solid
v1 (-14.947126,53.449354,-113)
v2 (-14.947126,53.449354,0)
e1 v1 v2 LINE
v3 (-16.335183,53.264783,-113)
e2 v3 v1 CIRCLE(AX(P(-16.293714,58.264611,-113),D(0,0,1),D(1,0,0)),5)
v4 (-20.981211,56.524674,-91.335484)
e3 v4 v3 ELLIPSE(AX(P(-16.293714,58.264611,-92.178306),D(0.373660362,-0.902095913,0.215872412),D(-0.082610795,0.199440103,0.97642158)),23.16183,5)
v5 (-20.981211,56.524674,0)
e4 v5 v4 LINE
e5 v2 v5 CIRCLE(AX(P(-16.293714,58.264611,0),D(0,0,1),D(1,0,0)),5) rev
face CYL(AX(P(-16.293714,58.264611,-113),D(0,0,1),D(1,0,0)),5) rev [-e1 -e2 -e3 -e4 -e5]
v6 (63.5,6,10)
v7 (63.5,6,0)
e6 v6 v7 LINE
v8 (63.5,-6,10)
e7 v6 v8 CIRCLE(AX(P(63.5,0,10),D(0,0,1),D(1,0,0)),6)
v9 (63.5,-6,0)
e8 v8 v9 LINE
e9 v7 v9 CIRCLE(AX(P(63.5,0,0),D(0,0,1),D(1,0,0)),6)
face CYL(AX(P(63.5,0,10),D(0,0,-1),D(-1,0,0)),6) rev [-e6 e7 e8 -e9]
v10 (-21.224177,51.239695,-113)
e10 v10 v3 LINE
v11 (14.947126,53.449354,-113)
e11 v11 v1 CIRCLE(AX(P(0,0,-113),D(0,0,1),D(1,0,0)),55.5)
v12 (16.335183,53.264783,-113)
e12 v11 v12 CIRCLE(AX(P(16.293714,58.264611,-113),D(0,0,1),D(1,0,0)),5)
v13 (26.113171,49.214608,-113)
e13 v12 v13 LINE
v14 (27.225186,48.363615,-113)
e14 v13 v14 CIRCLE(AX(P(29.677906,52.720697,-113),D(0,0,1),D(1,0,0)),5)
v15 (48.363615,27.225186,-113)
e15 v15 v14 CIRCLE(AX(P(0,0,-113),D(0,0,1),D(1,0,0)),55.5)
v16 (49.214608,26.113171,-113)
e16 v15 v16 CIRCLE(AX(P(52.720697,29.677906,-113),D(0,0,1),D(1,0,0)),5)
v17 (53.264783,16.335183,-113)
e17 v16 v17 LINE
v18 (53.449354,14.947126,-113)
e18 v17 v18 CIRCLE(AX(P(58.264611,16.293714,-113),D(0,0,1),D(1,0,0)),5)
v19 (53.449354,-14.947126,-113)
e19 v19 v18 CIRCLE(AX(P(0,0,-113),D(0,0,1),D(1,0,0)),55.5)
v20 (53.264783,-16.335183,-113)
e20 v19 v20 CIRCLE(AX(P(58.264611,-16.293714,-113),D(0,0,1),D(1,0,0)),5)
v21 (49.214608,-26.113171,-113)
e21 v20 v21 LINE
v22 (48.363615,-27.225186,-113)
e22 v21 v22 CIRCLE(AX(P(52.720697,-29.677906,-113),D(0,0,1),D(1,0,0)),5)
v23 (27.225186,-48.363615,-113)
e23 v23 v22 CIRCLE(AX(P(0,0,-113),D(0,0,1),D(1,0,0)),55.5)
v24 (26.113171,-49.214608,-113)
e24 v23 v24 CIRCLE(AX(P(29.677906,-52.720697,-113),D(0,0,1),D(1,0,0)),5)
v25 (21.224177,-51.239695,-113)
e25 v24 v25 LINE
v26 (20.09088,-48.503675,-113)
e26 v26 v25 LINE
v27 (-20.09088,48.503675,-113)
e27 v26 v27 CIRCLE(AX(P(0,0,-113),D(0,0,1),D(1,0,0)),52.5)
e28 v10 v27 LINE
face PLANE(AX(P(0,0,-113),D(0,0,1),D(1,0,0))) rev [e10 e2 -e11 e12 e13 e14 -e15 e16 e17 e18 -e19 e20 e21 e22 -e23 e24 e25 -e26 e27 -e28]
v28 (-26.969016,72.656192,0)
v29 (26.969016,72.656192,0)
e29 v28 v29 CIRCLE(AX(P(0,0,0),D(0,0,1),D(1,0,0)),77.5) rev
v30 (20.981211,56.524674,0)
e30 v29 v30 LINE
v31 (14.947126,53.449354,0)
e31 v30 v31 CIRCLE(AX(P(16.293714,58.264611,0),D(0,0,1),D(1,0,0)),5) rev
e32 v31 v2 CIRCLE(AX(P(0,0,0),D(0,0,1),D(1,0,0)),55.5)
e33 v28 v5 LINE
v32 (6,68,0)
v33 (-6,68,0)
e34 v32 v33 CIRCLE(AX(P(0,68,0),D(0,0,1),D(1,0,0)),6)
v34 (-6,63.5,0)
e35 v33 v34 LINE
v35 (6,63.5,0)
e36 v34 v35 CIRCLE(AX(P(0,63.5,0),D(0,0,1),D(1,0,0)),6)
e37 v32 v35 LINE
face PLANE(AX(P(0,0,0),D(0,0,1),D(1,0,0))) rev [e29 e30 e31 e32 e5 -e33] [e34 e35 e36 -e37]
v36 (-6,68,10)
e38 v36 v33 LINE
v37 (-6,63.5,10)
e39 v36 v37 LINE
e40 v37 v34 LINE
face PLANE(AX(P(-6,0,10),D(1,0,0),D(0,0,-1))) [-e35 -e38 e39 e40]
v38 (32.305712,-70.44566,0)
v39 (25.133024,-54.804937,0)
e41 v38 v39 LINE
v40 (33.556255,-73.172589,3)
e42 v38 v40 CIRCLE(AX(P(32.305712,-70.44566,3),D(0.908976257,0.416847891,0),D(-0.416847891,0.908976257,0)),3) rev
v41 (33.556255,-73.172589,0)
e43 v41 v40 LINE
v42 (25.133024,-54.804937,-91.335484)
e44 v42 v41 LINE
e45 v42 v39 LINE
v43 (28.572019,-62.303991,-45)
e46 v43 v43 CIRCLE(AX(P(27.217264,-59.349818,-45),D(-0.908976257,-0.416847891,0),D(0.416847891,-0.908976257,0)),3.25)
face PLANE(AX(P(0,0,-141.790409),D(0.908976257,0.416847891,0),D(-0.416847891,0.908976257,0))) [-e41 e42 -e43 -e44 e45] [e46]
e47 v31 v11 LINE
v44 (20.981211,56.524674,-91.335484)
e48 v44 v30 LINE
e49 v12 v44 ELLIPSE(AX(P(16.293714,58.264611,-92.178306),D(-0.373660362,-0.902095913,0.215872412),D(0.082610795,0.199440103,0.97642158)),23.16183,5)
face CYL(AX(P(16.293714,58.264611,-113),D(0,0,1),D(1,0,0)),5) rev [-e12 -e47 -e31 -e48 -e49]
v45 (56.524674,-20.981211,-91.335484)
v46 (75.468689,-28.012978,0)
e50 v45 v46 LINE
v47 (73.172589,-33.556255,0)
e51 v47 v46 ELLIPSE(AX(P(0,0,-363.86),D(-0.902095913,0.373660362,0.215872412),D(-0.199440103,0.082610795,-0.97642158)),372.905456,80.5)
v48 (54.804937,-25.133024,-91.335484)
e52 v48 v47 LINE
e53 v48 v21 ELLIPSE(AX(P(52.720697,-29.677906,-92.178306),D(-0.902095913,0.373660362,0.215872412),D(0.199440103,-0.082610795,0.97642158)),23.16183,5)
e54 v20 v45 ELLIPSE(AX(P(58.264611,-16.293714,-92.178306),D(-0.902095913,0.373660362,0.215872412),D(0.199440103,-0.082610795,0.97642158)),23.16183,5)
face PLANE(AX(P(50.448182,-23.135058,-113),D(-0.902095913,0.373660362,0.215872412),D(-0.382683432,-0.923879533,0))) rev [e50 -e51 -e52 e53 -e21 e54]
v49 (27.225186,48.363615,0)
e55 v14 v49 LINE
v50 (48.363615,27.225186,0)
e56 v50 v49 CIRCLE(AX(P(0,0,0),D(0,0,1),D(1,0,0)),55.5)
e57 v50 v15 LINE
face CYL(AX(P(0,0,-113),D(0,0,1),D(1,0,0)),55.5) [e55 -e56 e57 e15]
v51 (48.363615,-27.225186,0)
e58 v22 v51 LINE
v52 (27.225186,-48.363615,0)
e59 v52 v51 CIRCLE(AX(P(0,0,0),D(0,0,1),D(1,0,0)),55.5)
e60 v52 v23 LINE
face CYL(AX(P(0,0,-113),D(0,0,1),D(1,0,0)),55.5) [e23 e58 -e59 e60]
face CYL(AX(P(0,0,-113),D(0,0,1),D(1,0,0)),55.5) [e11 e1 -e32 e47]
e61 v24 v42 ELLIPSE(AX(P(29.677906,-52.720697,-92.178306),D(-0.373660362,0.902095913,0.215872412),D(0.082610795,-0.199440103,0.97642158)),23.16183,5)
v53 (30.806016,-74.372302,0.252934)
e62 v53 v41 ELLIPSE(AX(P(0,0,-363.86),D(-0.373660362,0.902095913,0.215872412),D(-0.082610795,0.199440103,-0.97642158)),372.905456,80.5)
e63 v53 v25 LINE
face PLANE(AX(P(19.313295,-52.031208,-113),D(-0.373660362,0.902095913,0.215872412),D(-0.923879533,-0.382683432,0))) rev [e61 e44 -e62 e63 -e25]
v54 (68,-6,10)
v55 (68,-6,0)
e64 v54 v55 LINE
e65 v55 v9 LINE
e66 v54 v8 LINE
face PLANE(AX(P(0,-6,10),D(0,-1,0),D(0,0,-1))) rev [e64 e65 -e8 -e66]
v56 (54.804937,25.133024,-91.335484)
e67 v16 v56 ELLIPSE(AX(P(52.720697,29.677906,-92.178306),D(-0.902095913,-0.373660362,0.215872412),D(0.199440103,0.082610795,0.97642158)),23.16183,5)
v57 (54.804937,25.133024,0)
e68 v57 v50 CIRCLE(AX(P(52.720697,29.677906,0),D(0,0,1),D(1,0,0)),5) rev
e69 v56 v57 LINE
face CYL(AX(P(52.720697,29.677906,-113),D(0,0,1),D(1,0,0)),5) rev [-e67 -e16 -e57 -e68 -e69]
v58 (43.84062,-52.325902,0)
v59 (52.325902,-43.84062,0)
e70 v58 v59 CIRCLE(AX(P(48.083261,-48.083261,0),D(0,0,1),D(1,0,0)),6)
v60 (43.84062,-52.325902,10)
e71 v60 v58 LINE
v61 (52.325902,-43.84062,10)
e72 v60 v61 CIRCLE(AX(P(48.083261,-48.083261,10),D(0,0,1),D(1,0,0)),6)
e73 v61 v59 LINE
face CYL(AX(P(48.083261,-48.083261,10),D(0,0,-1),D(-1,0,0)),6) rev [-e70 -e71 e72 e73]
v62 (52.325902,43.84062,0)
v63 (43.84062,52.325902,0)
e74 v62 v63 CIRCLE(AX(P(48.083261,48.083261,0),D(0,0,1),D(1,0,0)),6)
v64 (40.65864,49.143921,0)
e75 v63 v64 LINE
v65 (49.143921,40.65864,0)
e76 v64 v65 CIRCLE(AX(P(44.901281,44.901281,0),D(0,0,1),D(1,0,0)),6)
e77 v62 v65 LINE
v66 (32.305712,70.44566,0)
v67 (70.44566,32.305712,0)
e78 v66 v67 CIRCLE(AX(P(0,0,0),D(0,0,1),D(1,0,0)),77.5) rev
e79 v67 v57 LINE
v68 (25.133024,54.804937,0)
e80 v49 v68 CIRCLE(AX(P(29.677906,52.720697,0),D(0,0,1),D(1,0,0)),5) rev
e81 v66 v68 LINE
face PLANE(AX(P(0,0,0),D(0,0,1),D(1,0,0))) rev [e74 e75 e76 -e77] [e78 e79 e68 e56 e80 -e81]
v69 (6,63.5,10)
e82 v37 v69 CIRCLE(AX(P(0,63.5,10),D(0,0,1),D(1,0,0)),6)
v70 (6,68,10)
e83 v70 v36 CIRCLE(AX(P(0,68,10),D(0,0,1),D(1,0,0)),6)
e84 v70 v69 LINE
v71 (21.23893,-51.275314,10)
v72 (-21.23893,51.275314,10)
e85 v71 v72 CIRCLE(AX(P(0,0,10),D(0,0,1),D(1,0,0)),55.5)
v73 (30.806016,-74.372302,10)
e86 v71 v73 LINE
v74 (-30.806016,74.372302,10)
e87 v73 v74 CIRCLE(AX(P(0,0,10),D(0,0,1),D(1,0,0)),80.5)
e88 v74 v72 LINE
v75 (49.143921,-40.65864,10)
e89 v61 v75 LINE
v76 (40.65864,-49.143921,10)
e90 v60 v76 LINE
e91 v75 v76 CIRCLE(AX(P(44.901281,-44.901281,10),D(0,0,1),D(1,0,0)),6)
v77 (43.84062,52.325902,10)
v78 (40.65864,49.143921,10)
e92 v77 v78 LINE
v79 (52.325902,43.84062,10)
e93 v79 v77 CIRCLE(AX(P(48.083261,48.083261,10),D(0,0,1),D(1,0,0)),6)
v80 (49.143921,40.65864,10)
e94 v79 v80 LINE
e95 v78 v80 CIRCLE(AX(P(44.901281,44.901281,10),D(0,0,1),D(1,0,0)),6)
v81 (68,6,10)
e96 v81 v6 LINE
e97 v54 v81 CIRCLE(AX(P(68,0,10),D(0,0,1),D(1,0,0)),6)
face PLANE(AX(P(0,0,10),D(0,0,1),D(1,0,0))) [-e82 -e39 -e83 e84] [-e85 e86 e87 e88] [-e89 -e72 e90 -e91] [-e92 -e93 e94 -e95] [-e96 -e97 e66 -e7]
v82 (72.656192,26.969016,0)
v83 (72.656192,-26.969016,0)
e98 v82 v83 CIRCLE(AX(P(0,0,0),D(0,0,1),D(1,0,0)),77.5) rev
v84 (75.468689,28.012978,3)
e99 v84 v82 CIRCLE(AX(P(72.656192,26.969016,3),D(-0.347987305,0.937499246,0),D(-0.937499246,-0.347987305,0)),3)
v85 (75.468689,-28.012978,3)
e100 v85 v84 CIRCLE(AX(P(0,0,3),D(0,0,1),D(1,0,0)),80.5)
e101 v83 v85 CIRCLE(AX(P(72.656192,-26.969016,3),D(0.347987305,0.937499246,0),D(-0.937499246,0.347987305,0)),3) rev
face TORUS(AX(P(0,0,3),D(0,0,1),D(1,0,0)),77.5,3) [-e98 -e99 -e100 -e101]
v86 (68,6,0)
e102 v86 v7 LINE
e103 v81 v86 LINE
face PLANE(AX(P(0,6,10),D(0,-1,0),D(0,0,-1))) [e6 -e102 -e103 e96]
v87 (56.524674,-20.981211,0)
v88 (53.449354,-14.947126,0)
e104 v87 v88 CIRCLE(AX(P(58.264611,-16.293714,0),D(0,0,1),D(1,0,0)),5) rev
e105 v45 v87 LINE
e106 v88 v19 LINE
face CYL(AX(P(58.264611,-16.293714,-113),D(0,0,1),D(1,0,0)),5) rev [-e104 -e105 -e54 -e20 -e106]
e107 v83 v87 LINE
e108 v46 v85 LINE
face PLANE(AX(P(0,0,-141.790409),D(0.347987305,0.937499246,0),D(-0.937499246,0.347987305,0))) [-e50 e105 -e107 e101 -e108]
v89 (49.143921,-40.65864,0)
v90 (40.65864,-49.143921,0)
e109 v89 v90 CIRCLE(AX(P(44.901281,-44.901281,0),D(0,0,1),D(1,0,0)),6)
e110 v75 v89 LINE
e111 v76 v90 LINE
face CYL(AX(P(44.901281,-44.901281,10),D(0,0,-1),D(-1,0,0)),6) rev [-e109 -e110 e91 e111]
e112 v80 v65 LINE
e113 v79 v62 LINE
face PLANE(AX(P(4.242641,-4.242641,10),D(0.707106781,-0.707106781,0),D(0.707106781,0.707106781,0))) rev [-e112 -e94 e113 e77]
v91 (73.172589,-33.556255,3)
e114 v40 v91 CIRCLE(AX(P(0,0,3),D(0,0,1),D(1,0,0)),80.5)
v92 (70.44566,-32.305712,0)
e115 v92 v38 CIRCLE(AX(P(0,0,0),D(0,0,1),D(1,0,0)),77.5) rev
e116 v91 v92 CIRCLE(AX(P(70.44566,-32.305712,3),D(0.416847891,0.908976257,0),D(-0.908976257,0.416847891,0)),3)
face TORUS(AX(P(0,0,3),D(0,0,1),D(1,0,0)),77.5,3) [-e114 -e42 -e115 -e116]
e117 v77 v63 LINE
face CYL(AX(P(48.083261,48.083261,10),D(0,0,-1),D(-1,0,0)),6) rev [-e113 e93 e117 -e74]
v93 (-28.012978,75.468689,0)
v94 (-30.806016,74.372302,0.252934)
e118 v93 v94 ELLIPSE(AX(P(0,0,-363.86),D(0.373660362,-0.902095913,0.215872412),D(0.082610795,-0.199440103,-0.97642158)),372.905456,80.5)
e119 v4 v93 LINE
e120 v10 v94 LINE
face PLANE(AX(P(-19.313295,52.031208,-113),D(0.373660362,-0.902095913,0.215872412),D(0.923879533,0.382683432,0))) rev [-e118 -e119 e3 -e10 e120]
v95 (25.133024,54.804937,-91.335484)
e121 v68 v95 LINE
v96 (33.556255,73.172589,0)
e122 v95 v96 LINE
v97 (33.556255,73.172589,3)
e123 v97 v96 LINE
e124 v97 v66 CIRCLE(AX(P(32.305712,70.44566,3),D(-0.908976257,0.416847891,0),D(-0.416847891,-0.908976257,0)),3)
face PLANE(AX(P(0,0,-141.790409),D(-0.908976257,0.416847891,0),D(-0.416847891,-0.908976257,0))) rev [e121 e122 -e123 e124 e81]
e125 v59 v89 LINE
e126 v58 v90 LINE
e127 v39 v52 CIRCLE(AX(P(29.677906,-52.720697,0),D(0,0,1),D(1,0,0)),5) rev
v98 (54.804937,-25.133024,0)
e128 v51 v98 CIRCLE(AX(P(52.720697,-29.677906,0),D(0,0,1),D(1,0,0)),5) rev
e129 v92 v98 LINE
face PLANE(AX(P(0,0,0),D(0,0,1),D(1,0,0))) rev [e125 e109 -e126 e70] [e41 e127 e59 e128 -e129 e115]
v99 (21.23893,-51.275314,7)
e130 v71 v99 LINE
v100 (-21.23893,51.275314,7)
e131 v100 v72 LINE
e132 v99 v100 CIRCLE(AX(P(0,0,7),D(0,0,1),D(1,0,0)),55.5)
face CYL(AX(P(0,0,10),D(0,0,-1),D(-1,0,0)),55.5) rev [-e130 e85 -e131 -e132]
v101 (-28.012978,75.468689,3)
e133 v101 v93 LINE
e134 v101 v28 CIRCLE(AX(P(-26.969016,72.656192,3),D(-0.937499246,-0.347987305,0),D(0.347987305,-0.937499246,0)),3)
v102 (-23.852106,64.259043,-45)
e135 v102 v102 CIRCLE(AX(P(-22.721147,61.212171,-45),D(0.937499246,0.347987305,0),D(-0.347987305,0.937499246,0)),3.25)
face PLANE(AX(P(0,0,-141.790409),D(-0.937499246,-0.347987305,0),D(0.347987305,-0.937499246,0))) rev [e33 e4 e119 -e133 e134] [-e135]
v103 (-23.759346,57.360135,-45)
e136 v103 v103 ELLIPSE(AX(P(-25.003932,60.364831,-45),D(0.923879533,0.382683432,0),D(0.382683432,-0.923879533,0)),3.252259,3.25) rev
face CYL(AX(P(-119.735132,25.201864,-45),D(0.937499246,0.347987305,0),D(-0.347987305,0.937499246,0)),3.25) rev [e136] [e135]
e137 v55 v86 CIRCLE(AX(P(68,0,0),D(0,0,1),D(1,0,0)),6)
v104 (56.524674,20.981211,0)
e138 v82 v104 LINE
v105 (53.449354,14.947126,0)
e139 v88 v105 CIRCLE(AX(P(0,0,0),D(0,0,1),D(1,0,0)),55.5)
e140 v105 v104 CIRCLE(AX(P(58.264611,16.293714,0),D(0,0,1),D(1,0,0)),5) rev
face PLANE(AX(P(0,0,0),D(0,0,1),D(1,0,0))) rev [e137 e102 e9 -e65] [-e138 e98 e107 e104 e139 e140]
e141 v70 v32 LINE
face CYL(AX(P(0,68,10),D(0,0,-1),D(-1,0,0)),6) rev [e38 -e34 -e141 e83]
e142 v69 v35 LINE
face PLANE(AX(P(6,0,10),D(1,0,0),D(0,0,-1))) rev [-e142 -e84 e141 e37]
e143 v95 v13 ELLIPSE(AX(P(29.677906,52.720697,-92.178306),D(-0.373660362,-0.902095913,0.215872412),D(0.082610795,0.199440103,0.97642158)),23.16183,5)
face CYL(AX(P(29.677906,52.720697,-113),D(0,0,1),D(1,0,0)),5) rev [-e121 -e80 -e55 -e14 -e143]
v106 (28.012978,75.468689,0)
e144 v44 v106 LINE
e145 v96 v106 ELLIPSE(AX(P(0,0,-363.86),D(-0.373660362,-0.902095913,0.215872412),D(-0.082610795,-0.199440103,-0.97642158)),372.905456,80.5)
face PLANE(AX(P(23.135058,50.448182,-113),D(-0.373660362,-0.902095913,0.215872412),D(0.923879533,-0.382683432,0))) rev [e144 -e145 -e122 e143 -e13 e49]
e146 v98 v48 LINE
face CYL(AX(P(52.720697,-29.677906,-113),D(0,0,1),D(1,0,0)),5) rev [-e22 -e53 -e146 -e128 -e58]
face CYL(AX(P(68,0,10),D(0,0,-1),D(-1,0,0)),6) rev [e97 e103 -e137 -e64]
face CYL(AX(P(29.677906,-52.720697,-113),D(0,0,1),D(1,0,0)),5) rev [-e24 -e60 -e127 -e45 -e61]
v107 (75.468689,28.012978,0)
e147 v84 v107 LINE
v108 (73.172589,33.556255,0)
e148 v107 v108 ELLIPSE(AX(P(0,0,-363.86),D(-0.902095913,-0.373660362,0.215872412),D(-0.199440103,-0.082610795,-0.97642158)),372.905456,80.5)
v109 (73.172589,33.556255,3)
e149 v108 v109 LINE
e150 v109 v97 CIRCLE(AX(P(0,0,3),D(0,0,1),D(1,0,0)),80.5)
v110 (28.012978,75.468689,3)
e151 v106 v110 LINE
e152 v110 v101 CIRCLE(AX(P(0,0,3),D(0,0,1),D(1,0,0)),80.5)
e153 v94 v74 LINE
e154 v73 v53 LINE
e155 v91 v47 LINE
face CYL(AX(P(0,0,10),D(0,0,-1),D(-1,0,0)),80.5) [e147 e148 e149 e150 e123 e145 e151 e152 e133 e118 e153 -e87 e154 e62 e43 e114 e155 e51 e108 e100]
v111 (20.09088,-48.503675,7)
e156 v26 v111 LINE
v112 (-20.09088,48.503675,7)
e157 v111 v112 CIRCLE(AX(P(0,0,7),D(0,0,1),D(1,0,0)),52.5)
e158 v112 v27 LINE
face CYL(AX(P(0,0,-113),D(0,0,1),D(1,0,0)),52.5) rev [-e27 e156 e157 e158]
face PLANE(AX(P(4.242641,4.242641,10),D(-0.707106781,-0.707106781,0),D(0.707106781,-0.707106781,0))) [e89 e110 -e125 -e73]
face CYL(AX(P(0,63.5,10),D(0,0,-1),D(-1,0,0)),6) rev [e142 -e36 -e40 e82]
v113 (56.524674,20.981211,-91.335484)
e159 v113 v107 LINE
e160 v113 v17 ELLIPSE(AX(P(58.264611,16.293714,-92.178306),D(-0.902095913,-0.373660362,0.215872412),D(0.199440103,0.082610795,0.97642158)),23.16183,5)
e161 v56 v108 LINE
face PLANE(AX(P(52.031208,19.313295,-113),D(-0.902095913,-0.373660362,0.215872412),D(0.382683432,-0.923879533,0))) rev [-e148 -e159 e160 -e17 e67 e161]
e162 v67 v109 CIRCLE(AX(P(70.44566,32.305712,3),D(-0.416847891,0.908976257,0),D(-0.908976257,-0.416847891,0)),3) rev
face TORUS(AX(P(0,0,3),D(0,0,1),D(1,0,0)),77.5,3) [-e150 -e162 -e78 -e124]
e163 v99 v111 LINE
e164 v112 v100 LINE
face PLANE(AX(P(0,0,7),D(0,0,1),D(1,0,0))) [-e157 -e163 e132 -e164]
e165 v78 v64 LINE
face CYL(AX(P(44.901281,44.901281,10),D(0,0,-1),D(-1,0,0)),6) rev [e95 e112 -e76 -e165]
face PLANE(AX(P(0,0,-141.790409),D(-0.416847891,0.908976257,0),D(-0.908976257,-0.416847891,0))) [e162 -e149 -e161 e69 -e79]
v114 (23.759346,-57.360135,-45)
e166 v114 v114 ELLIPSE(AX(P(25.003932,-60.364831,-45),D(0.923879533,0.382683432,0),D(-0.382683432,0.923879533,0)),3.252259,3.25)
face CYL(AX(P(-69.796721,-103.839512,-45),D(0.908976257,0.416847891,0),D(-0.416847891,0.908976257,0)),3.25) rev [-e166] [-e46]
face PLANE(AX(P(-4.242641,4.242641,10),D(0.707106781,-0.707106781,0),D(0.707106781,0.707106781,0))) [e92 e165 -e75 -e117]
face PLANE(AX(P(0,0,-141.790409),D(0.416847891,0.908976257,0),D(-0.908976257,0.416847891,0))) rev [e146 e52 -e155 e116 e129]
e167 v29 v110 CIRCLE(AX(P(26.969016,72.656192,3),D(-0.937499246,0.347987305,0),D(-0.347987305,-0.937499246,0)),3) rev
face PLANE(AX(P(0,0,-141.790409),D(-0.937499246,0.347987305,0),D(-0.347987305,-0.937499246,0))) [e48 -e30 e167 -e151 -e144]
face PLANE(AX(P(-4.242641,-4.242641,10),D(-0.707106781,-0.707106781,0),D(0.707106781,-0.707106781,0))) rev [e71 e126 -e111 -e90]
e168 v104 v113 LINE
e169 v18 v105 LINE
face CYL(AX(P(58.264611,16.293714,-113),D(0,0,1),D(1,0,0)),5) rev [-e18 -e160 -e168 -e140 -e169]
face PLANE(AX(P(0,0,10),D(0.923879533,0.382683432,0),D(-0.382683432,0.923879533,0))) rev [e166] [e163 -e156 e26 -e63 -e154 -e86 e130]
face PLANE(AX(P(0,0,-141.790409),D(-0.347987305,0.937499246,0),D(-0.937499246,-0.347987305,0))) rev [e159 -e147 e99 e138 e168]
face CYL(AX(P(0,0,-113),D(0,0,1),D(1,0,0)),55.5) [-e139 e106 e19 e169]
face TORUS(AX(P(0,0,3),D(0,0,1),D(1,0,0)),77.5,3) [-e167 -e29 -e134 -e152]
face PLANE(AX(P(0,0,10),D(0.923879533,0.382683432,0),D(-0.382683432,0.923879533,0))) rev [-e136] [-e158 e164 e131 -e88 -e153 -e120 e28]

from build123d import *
from build123d.topology import SkipClean

# Parameters (mm, degrees)
SKETCH1_R               = 80.5
SKETCH1_R_2             = 55.5
BOSS_EXTRUDE1_DEPTH     = 10
BOSS_EXTRUDE2_START     = -120
SKETCH2_R               = 55.5
SKETCH2_R_2             = 52.5
BOSS_EXTRUDE2_DEPTH     = 120
BOSS_EXTRUDE3_START     = 113
BOSS_EXTRUDE3_DEPTH     = 113
SKETCH7_R               = 250
CUT_EXTRUDE1_DEPTH      = 211.239031532
CIRPATTERN1_COUNT       = 8
FILLET1_R               = 5
FILLET2_R               = 5
FILLET3_R               = 5
FILLET4_R               = 5
FILLET5_R               = 5
FILLET6_R               = 5
FILLET7_R               = 5
FILLET8_R               = 5
SKETCH10_R              = 3.25
CUT_EXTRUDE2_DEPTH      = 161.404177003
FILLET10_R              = 3
CUT_EXTRUDE3_DEPTH      = 161.404177103
CUT_EXTRUDE3_DEPTH_BACK = 161.404177103


with BuildPart() as part:
    # Sketch1 → Boss-Extrude1 (new body)
    with BuildSketch(Plane.XY):
        Circle(SKETCH1_R)
        with BuildLine():
            Line((-40.658639918, -49.143921292), (-43.840620434, -52.325901808))
            ThreePointArc((-43.840620434, -52.325901808), (-52.325901808, -52.325901808), (-52.325901808, -43.840620434))
            Line((-52.325901808, -43.840620434), (-49.143921292, -40.658639918))
            ThreePointArc((-49.143921292, -40.658639918), (-42.605180011, -39.35800341), (-38.901280605, -44.901280605))
            ThreePointArc((-38.901280605, -44.901280605), (-39.35800341, -47.1973812), (-40.658639918, -49.143921292))
        make_face(mode=Mode.SUBTRACT)
        Circle(SKETCH1_R_2, mode=Mode.SUBTRACT)
        with BuildLine():
            Line((6, -63.5), (6, -68))
            ThreePointArc((6, -68), (0, -74), (-6, -68))
            Line((-6, -68), (-6, -63.5))
            ThreePointArc((-6, -63.5), (0, -57.5), (6, -63.5))
        make_face(mode=Mode.SUBTRACT)
        with BuildLine():
            Line((49.143921292, -40.658639918), (52.325901808, -43.840620434))
            ThreePointArc((52.325901808, -43.840620434), (53.626538316, -45.787160526), (54.083261121, -48.083261121))
            ThreePointArc((54.083261121, -48.083261121), (50.379361715, -53.626538316), (43.840620434, -52.325901808))
            Line((43.840620434, -52.325901808), (40.658639918, -49.143921292))
            ThreePointArc((40.658639918, -49.143921292), (40.658639918, -40.658639918), (49.143921292, -40.658639918))
        make_face(mode=Mode.SUBTRACT)
        with BuildLine():
            Line((-63.5, -6), (-68, -6))
            ThreePointArc((-68, -6), (-74, 0), (-68, 6))
            Line((-68, 6), (-63.5, 6))
            ThreePointArc((-63.5, 6), (-59.257359313, 4.242640687), (-57.5, 0))
            ThreePointArc((-57.5, 0), (-59.257359313, -4.242640687), (-63.5, -6))
        make_face(mode=Mode.SUBTRACT)
        with BuildLine():
            Line((-49.143921292, 40.658639918), (-52.325901808, 43.840620434))
            ThreePointArc((-52.325901808, 43.840620434), (-52.325901808, 52.325901808), (-43.840620434, 52.325901808))
            Line((-43.840620434, 52.325901808), (-40.658639918, 49.143921292))
            ThreePointArc((-40.658639918, 49.143921292), (-39.35800341, 47.1973812), (-38.901280605, 44.901280605))
            ThreePointArc((-38.901280605, 44.901280605), (-42.605180011, 39.35800341), (-49.143921292, 40.658639918))
        make_face(mode=Mode.SUBTRACT)
        with BuildLine():
            Line((-6, 63.5), (-6, 68))
            ThreePointArc((-6, 68), (0, 74), (6, 68))
            Line((6, 68), (6, 63.5))
            ThreePointArc((6, 63.5), (0, 57.5), (-6, 63.5))
        make_face(mode=Mode.SUBTRACT)
        with BuildLine():
            Line((63.5, 6), (68, 6))
            ThreePointArc((68, 6), (72.242640687, 4.242640687), (74, 0))
            ThreePointArc((74, 0), (72.242640687, -4.242640687), (68, -6))
            Line((68, -6), (63.5, -6))
            ThreePointArc((63.5, -6), (57.5, 0), (63.5, 6))
        make_face(mode=Mode.SUBTRACT)
        with BuildLine():
            Line((40.658639918, 49.143921292), (43.840620434, 52.325901808))
            ThreePointArc((43.840620434, 52.325901808), (50.379361715, 53.626538316), (54.083261121, 48.083261121))
            ThreePointArc((54.083261121, 48.083261121), (53.626538316, 45.787160526), (52.325901808, 43.840620434))
            Line((52.325901808, 43.840620434), (49.143921292, 40.658639918))
            ThreePointArc((49.143921292, 40.658639918), (40.658639918, 40.658639918), (40.658639918, 49.143921292))
        make_face(mode=Mode.SUBTRACT)
    extrude(amount=BOSS_EXTRUDE1_DEPTH)

    # Sketch2 → Boss-Extrude2 (add)
    with BuildSketch(Plane.XY.offset(7).offset(BOSS_EXTRUDE2_START)):
        Circle(SKETCH2_R)
        Circle(SKETCH2_R_2, mode=Mode.SUBTRACT)
    extrude(amount=BOSS_EXTRUDE2_DEPTH)

    # Sketch6 → Boss-Extrude3 (add)
    with SkipClean():  # the faces are left unmerged after this step: merging them gives an invalid solid
        with BuildSketch(Plane(origin=(0, 0, 0), x_dir=(-1, 0, 0), z_dir=(0, 0, -1)).offset(BOSS_EXTRUDE3_START)):
            with BuildLine():
                ThreePointArc((33.556255229, 73.172588686), (30.806016305, 74.372302367), (28.012978034, 75.46868928))
                Line((28.012978034, 75.46868928), (19.313295414, 52.031208137))
                ThreePointArc((19.313295414, 52.031208137), (21.238930496, 51.275314054), (23.135057953, 50.448182262))
                Line((23.135057953, 50.448182262), (33.556255229, 73.172588686))
            make_face()
        boss_extrude3 = extrude(amount=-BOSS_EXTRUDE3_DEPTH)

    # Sketch7 → Cut-Extrude1 (cut, through all)
    with BuildSketch(Plane(origin=(-29.35002585, 70.857230463, -16.956202766), x_dir=(-0.9275655947526923, -0.3633903135082553, 0.08700314637676126), z_dir=(0.37366036168069705, -0.9020959128907735, 0.21587241151757414))):
        with Locations((-10.82464423, 97.787489685)):
            Circle(SKETCH7_R)
    cut_extrude1 = extrude(amount=-CUT_EXTRUDE1_DEPTH, mode=Mode.SUBTRACT)

    # CirPattern1: Boss-Extrude3, Cut-Extrude1 ×8 about axis
    with SkipClean():  # the faces are left unmerged after this step: merging them gives an invalid solid
        cirpattern1_axis = Axis((0, 0, 0), (0, 0, 1))
        add([boss_extrude3.rotate(cirpattern1_axis, i * 360 / CIRPATTERN1_COUNT) for i in range(1, CIRPATTERN1_COUNT)])
        add([cut_extrude1.rotate(cirpattern1_axis, i * 360 / CIRPATTERN1_COUNT) for i in range(1, CIRPATTERN1_COUNT)], mode=Mode.SUBTRACT)

    # Fillet1
    fillet1_edges = [part.edges().sort_by_distance(p)[0] for p in [
        (-19.313295414, -52.031208137, -56.5),
        (19.313295414, -52.031208137, -56.5),
    ]]
    fillet(fillet1_edges, radius=FILLET1_R)

    # Fillet2
    fillet2_edges = [part.edges().sort_by_distance(p)[0] for p in [
        (23.135057953, -50.448182262, -56.5),
        (50.448182262, -23.135057953, -56.5),
    ]]
    fillet(fillet2_edges, radius=FILLET2_R)

    # Fillet3
    fillet3_edges = [part.edges().sort_by_distance(p)[0] for p in [
        (52.031208137, -19.313295414, -56.5),
        (52.031208137, 19.313295414, -56.5),
    ]]
    fillet(fillet3_edges, radius=FILLET3_R)

    # Fillet4
    fillet4_edges = [part.edges().sort_by_distance(p)[0] for p in [
        (50.448182262, 23.135057953, -56.5),
        (23.135057953, 50.448182262, -56.5),
    ]]
    fillet(fillet4_edges, radius=FILLET4_R)

    # Fillet5
    fillet5_edges = [part.edges().sort_by_distance(p)[0] for p in [
        (-19.313295414, 52.031208137, -56.5),
        (19.313295414, 52.031208137, -56.5),
    ]]
    fillet(fillet5_edges, radius=FILLET5_R)

    # Fillet6
    fillet6_edges = [part.edges().sort_by_distance(p)[0] for p in [
        (-23.135057953, 50.448182262, -56.5),
        (-50.448182262, 23.135057953, -56.5),
    ]]
    fillet(fillet6_edges, radius=FILLET6_R)

    # Fillet7
    fillet7_edges = [part.edges().sort_by_distance(p)[0] for p in [
        (-52.031208137, 19.313295414, -56.5),
        (-52.031208137, -19.313295414, -56.5),
    ]]
    fillet(fillet7_edges, radius=FILLET7_R)

    # Fillet8
    fillet8_edges = [part.edges().sort_by_distance(p)[0] for p in [
        (-50.448182262, -23.135057953, -56.5),
        (-23.135057953, -50.448182262, -56.5),
    ]]
    fillet(fillet8_edges, radius=FILLET8_R)

    # Sketch10 → Cut-Extrude2 (cut, through all)
    with BuildSketch(Plane(origin=(0, 0, 0), x_dir=(0, 0, -1), z_dir=(0.93749924571842, 0.3479873047646907, 0))):
        with Locations(Location((45, 65.293034424, 0), (0, 0, 90))):
            Circle(SKETCH10_R)
    cut_extrude2 = extrude(amount=-CUT_EXTRUDE2_DEPTH, mode=Mode.SUBTRACT)

    # Mirror1: Cut-Extrude2 across plane
    add(cut_extrude2.mirror(Plane(origin=(0, 0, 0), x_dir=(0, 0, 1), z_dir=(-0.382683432365086, 0.9238795325112884, 0))), mode=Mode.SUBTRACT)

    # Fillet10
    # the kernel refuses this fillet: 3 mm, written as the material it takes off along each edge
    with BuildSketch(Plane(origin=(0, 0, 0), x_dir=(-0.33046803638275346, 0.9438171840612604, 0), z_dir=(0.9438171840612604, 0.33046803638275346, 0))) as fillet10_piece_1_section:
        with BuildLine():
            CenterArc((80.5 - FILLET10_R, FILLET10_R), FILLET10_R, 270, 90)
            Line((80.5 - FILLET10_R, 0), (80.5, 0))
            Line((80.5, 0), (80.5, FILLET10_R))
        make_face()
    fillet10_piece_1 = revolve(axis=Axis((0, 0, 0), (0, 0, 1)), revolution_arc=46.06707315, mode=Mode.PRIVATE)
    fillet10_piece_1 = split(fillet10_piece_1, bisect_by=Plane(origin=(-27.776847932, 74.832540233, 0.682281157), z_dir=(0.93749924571842, 0.34798730476469053, 0)), keep=Keep.TOP, mode=Mode.PRIVATE)
    add(fillet10_piece_1, mode=Mode.SUBTRACT)
    with BuildSketch(Plane(origin=(0, 0, 0), x_dir=(-0.41684789103882375, 0.9089762569707115, 0), z_dir=(0.9089762569707115, 0.41684789103882375, 0))) as fillet10_piece_2:
        with BuildLine():
            CenterArc((80.5 - FILLET10_R, FILLET10_R), FILLET10_R, 270, 90)
            Line((80.5 - FILLET10_R, 0), (80.5, 0))
            Line((80.5, 0), (80.5, FILLET10_R))
        make_face()
    revolve(axis=Axis((0, 0, 0), (0, 0, 1)), revolution_arc=40.728517997, mode=Mode.SUBTRACT)
    with BuildSketch(Plane(origin=(0, 0, 0), x_dir=(-0.41684789103882375, 0.9089762569707115, 0), z_dir=(0.9089762569707115, 0.41684789103882375, 0))) as fillet10_piece_3_section:
        with BuildLine():
            CenterArc((80.5 - FILLET10_R, FILLET10_R), FILLET10_R, 270, 90)
            Line((80.5 - FILLET10_R, 0), (80.5, 0))
            Line((80.5, 0), (80.5, FILLET10_R))
        make_face()
    fillet10_piece_3 = revolve(axis=Axis((0, 0, 0), (0, 0, 1)), revolution_arc=46.06707315, mode=Mode.PRIVATE)
    fillet10_piece_3 = split(fillet10_piece_3, bisect_by=Plane(origin=(-74.832540233, 27.776847932, 0.682281157), z_dir=(-0.34798730476469253, -0.9374992457184192, 0)), keep=Keep.TOP, mode=Mode.PRIVATE)
    add(fillet10_piece_3, mode=Mode.SUBTRACT)
    with BuildSketch(Plane(origin=(0, 0, 0), x_dir=(-0.9010557205417569, 0.4337033415584614, 0), z_dir=(0.4337033415584614, 0.9010557205417569, 0))) as fillet10_piece_4_section:
        with BuildLine():
            CenterArc((80.5 - FILLET10_R, FILLET10_R), FILLET10_R, 270, 90)
            Line((80.5 - FILLET10_R, 0), (80.5, 0))
            Line((80.5, 0), (80.5, FILLET10_R))
        make_face()
    fillet10_piece_4 = revolve(axis=Axis((0, 0, 0), (0, 0, 1)), revolution_arc=46.06707315, mode=Mode.PRIVATE)
    fillet10_piece_4 = split(fillet10_piece_4, bisect_by=Plane(origin=(-72.555793839, 33.273398961, 0.682281047), z_dir=(0.4168478910388258, 0.9089762569707106, 0)), keep=Keep.TOP, mode=Mode.PRIVATE)
    add(fillet10_piece_4, mode=Mode.SUBTRACT)
    with BuildSketch(Plane(origin=(0, 0, 0), x_dir=(-0.9374992457184192, 0.34798730476469253, 0), z_dir=(0.34798730476469253, 0.9374992457184192, 0))) as fillet10_piece_5:
        with BuildLine():
            CenterArc((80.5 - FILLET10_R, FILLET10_R), FILLET10_R, 270, 90)
            Line((80.5 - FILLET10_R, 0), (80.5, 0))
            Line((80.5, 0), (80.5, FILLET10_R))
        make_face()
    revolve(axis=Axis((0, 0, 0), (0, 0, 1)), revolution_arc=40.728517997, mode=Mode.SUBTRACT)
    with BuildSketch(Plane(origin=(0, 0, 0), x_dir=(-0.9374992457184192, 0.34798730476469253, 0), z_dir=(0.34798730476469253, 0.9374992457184192, 0))) as fillet10_piece_6_section:
        with BuildLine():
            CenterArc((80.5 - FILLET10_R, FILLET10_R), FILLET10_R, 270, 90)
            Line((80.5 - FILLET10_R, 0), (80.5, 0))
            Line((80.5, 0), (80.5, FILLET10_R))
        make_face()
    fillet10_piece_6 = revolve(axis=Axis((0, 0, 0), (0, 0, 1)), revolution_arc=46.06707315, mode=Mode.PRIVATE)
    fillet10_piece_6 = split(fillet10_piece_6, bisect_by=Plane(origin=(-72.555794184, -33.27339912, 0.682281157), z_dir=(0.41684789103882375, -0.9089762569707115, 0)), keep=Keep.TOP, mode=Mode.PRIVATE)
    add(fillet10_piece_6, mode=Mode.SUBTRACT)
    with BuildSketch(Plane(origin=(0, 0, 0), x_dir=(-0.9438171840612604, -0.3304680363827534, 0), z_dir=(-0.3304680363827534, 0.9438171840612604, 0))) as fillet10_piece_7_section:
        with BuildLine():
            CenterArc((80.5 - FILLET10_R, FILLET10_R), FILLET10_R, 270, 90)
            Line((80.5 - FILLET10_R, 0), (80.5, 0))
            Line((80.5, 0), (80.5, FILLET10_R))
        make_face()
    fillet10_piece_7 = revolve(axis=Axis((0, 0, 0), (0, 0, 1)), revolution_arc=46.06707315, mode=Mode.PRIVATE)
    fillet10_piece_7 = split(fillet10_piece_7, bisect_by=Plane(origin=(-74.832540233, -27.776847932, 0.682281157), z_dir=(-0.3479873047646904, 0.93749924571842, 0)), keep=Keep.TOP, mode=Mode.PRIVATE)
    add(fillet10_piece_7, mode=Mode.SUBTRACT)
    with BuildSketch(Plane(origin=(0, 0, 0), x_dir=(-0.9089762569707115, -0.41684789103882364, 0), z_dir=(-0.41684789103882364, 0.9089762569707115, 0))) as fillet10_piece_8:
        with BuildLine():
            CenterArc((80.5 - FILLET10_R, FILLET10_R), FILLET10_R, 270, 90)
            Line((80.5 - FILLET10_R, 0), (80.5, 0))
            Line((80.5, 0), (80.5, FILLET10_R))
        make_face()
    revolve(axis=Axis((0, 0, 0), (0, 0, 1)), revolution_arc=40.728517997, mode=Mode.SUBTRACT)
    with BuildSketch(Plane(origin=(0, 0, 0), x_dir=(-0.9089762569707115, -0.41684789103882364, 0), z_dir=(-0.41684789103882364, 0.9089762569707115, 0))) as fillet10_piece_9_section:
        with BuildLine():
            CenterArc((80.5 - FILLET10_R, FILLET10_R), FILLET10_R, 270, 90)
            Line((80.5 - FILLET10_R, 0), (80.5, 0))
            Line((80.5, 0), (80.5, FILLET10_R))
        make_face()
    fillet10_piece_9 = revolve(axis=Axis((0, 0, 0), (0, 0, 1)), revolution_arc=46.06707315, mode=Mode.PRIVATE)
    fillet10_piece_9 = split(fillet10_piece_9, bisect_by=Plane(origin=(-27.776847932, -74.832540233, 0.682281157), z_dir=(0.9374992457184192, -0.34798730476469253, 0)), keep=Keep.TOP, mode=Mode.PRIVATE)
    add(fillet10_piece_9, mode=Mode.SUBTRACT)
    with BuildSketch(Plane(origin=(0, 0, 0), x_dir=(-0.4337033415584623, -0.9010557205417564, 0), z_dir=(-0.9010557205417564, 0.4337033415584623, 0))) as fillet10_piece_10_section:
        with BuildLine():
            CenterArc((80.5 - FILLET10_R, FILLET10_R), FILLET10_R, 270, 90)
            Line((80.5 - FILLET10_R, 0), (80.5, 0))
            Line((80.5, 0), (80.5, FILLET10_R))
        make_face()
    fillet10_piece_10 = revolve(axis=Axis((0, 0, 0), (0, 0, 1)), revolution_arc=46.06707315, mode=Mode.PRIVATE)
    fillet10_piece_10 = split(fillet10_piece_10, bisect_by=Plane(origin=(-33.273398964, -72.555793844, 0.68228105), z_dir=(-0.9089762569707106, 0.4168478910388258, 0)), keep=Keep.TOP, mode=Mode.PRIVATE)
    add(fillet10_piece_10, mode=Mode.SUBTRACT)
    with BuildSketch(Plane(origin=(0, 0, 0), x_dir=(-0.34798730476469303, -0.9374992457184189, 0), z_dir=(-0.9374992457184189, 0.34798730476469303, 0))) as fillet10_piece_11:
        with BuildLine():
            CenterArc((80.5 - FILLET10_R, FILLET10_R), FILLET10_R, 270, 90)
            Line((80.5 - FILLET10_R, 0), (80.5, 0))
            Line((80.5, 0), (80.5, FILLET10_R))
        make_face()
    revolve(axis=Axis((0, 0, 0), (0, 0, 1)), revolution_arc=40.728517997, mode=Mode.SUBTRACT)
    with BuildSketch(Plane(origin=(0, 0, 0), x_dir=(-0.34798730476469303, -0.9374992457184189, 0), z_dir=(-0.9374992457184189, 0.34798730476469303, 0))) as fillet10_piece_12_section:
        with BuildLine():
            CenterArc((80.5 - FILLET10_R, FILLET10_R), FILLET10_R, 270, 90)
            Line((80.5 - FILLET10_R, 0), (80.5, 0))
            Line((80.5, 0), (80.5, FILLET10_R))
        make_face()
    fillet10_piece_12 = revolve(axis=Axis((0, 0, 0), (0, 0, 1)), revolution_arc=46.06707315, mode=Mode.PRIVATE)
    fillet10_piece_12 = split(fillet10_piece_12, bisect_by=Plane(origin=(33.27339912, -72.555794184, 0.682281157), z_dir=(0.9089762569707115, 0.41684789103882375, 0)), keep=Keep.TOP, mode=Mode.PRIVATE)
    add(fillet10_piece_12, mode=Mode.SUBTRACT)
    with BuildSketch(Plane(origin=(0, 0, 0), x_dir=(0.3304680363827525, -0.9438171840612608, 0), z_dir=(-0.9438171840612608, -0.3304680363827525, 0))) as fillet10_piece_13_section:
        with BuildLine():
            CenterArc((80.5 - FILLET10_R, FILLET10_R), FILLET10_R, 270, 90)
            Line((80.5 - FILLET10_R, 0), (80.5, 0))
            Line((80.5, 0), (80.5, FILLET10_R))
        make_face()
    fillet10_piece_13 = revolve(axis=Axis((0, 0, 0), (0, 0, 1)), revolution_arc=46.06707315, mode=Mode.PRIVATE)
    fillet10_piece_13 = split(fillet10_piece_13, bisect_by=Plane(origin=(27.776847932, -74.832540233, 0.682281157), z_dir=(-0.93749924571842, -0.3479873047646904, 0)), keep=Keep.TOP, mode=Mode.PRIVATE)
    add(fillet10_piece_13, mode=Mode.SUBTRACT)
    with BuildSketch(Plane(origin=(0, 0, 0), x_dir=(0.4168478910388232, -0.9089762569707117, 0), z_dir=(-0.9089762569707117, -0.4168478910388232, 0))) as fillet10_piece_14:
        with BuildLine():
            CenterArc((80.5 - FILLET10_R, FILLET10_R), FILLET10_R, 270, 90)
            Line((80.5 - FILLET10_R, 0), (80.5, 0))
            Line((80.5, 0), (80.5, FILLET10_R))
        make_face()
    revolve(axis=Axis((0, 0, 0), (0, 0, 1)), revolution_arc=40.728517997, mode=Mode.SUBTRACT)
    with BuildSketch(Plane(origin=(0, 0, 0), x_dir=(0.4168478910388232, -0.9089762569707117, 0), z_dir=(-0.9089762569707117, -0.4168478910388232, 0))) as fillet10_piece_15_section:
        with BuildLine():
            CenterArc((80.5 - FILLET10_R, FILLET10_R), FILLET10_R, 270, 90)
            Line((80.5 - FILLET10_R, 0), (80.5, 0))
            Line((80.5, 0), (80.5, FILLET10_R))
        make_face()
    fillet10_piece_15 = revolve(axis=Axis((0, 0, 0), (0, 0, 1)), revolution_arc=46.06707315, mode=Mode.PRIVATE)
    fillet10_piece_15 = split(fillet10_piece_15, bisect_by=Plane(origin=(74.832540233, -27.776847932, 0.682281157), z_dir=(0.34798730476469264, 0.9374992457184192, 0)), keep=Keep.TOP, mode=Mode.PRIVATE)
    add(fillet10_piece_15, mode=Mode.SUBTRACT)
    with BuildSketch(Plane(origin=(0, 0, 0), x_dir=(1, 0, 0), z_dir=(0, -1, 0))) as fillet10_piece_16:
        with BuildLine():
            CenterArc((80.5 - FILLET10_R, FILLET10_R), FILLET10_R, 270, 90)
            Line((80.5 - FILLET10_R, 0), (80.5, 0))
            Line((80.5, 0), (80.5, FILLET10_R))
        make_face()
    revolve(axis=Axis((0, 0, 0), (0, 0, 1)), revolution_arc=20.364258998, mode=Mode.SUBTRACT)
    with BuildSketch(Plane(origin=(0, 0, 0), x_dir=(1, 0, 0), z_dir=(0, -1, 0))) as fillet10_piece_17_section:
        with BuildLine():
            CenterArc((80.5 - FILLET10_R, FILLET10_R), FILLET10_R, 270, 90)
            Line((80.5 - FILLET10_R, 0), (80.5, 0))
            Line((80.5, 0), (80.5, FILLET10_R))
        make_face()
    fillet10_piece_17 = revolve(axis=Axis((0, 0, 0), (0, 0, 1)), revolution_arc=25.70248486, mode=Mode.PRIVATE)
    fillet10_piece_17 = split(fillet10_piece_17, bisect_by=Plane(origin=(72.555796773, 33.273400307, 0.682281157), z_dir=(-0.41684789103882364, 0.9089762569707116, 0)), keep=Keep.TOP, mode=Mode.PRIVATE)
    add(fillet10_piece_17, mode=Mode.SUBTRACT)
    with BuildSketch(Plane(origin=(0, 0, 0), x_dir=(0.9438171840612604, 0.3304680363827533, 0), z_dir=(0.3304680363827533, -0.9438171840612604, 0))) as fillet10_piece_18_section:
        with BuildLine():
            CenterArc((80.5 - FILLET10_R, FILLET10_R), FILLET10_R, 270, 90)
            Line((80.5 - FILLET10_R, 0), (80.5, 0))
            Line((80.5, 0), (80.5, FILLET10_R))
        make_face()
    fillet10_piece_18 = revolve(axis=Axis((0, 0, 0), (0, 0, 1)), revolution_arc=46.06707315, mode=Mode.PRIVATE)
    fillet10_piece_18 = split(fillet10_piece_18, bisect_by=Plane(origin=(74.832540233, 27.776847932, 0.682281157), z_dir=(0.3479873047646903, -0.9374992457184201, 0)), keep=Keep.TOP, mode=Mode.PRIVATE)
    add(fillet10_piece_18, mode=Mode.SUBTRACT)
    with BuildSketch(Plane(origin=(0, 0, 0), x_dir=(0.9089762569707115, 0.41684789103882364, 0), z_dir=(0.41684789103882364, -0.9089762569707115, 0))) as fillet10_piece_19:
        with BuildLine():
            CenterArc((80.5 - FILLET10_R, FILLET10_R), FILLET10_R, 270, 90)
            Line((80.5 - FILLET10_R, 0), (80.5, 0))
            Line((80.5, 0), (80.5, FILLET10_R))
        make_face()
    revolve(axis=Axis((0, 0, 0), (0, 0, 1)), revolution_arc=40.728517997, mode=Mode.SUBTRACT)
    with BuildSketch(Plane(origin=(0, 0, 0), x_dir=(0.9089762569707115, 0.41684789103882364, 0), z_dir=(0.41684789103882364, -0.9089762569707115, 0))) as fillet10_piece_20_section:
        with BuildLine():
            CenterArc((80.5 - FILLET10_R, FILLET10_R), FILLET10_R, 270, 90)
            Line((80.5 - FILLET10_R, 0), (80.5, 0))
            Line((80.5, 0), (80.5, FILLET10_R))
        make_face()
    fillet10_piece_20 = revolve(axis=Axis((0, 0, 0), (0, 0, 1)), revolution_arc=46.06707315, mode=Mode.PRIVATE)
    fillet10_piece_20 = split(fillet10_piece_20, bisect_by=Plane(origin=(27.776847932, 74.832540233, 0.682281157), z_dir=(-0.9374992457184192, 0.3479873047646927, 0)), keep=Keep.TOP, mode=Mode.PRIVATE)
    add(fillet10_piece_20, mode=Mode.SUBTRACT)
    with BuildSketch(Plane(origin=(0, 0, 0), x_dir=(0.4337033415584618, 0.9010557205417566, 0), z_dir=(0.9010557205417566, -0.4337033415584618, 0))) as fillet10_piece_21_section:
        with BuildLine():
            CenterArc((80.5 - FILLET10_R, FILLET10_R), FILLET10_R, 270, 90)
            Line((80.5 - FILLET10_R, 0), (80.5, 0))
            Line((80.5, 0), (80.5, FILLET10_R))
        make_face()
    fillet10_piece_21 = revolve(axis=Axis((0, 0, 0), (0, 0, 1)), revolution_arc=46.06707315, mode=Mode.PRIVATE)
    fillet10_piece_21 = split(fillet10_piece_21, bisect_by=Plane(origin=(33.27339912, 72.555794184, 0.682281157), z_dir=(0.9089762569707105, -0.41684789103882597, 0)), keep=Keep.TOP, mode=Mode.PRIVATE)
    add(fillet10_piece_21, mode=Mode.SUBTRACT)
    with BuildSketch(Plane(origin=(0, 0, 0), x_dir=(0.3479873047646927, 0.9374992457184191, 0), z_dir=(0.9374992457184191, -0.3479873047646927, 0))) as fillet10_piece_22:
        with BuildLine():
            CenterArc((80.5 - FILLET10_R, FILLET10_R), FILLET10_R, 270, 90)
            Line((80.5 - FILLET10_R, 0), (80.5, 0))
            Line((80.5, 0), (80.5, FILLET10_R))
        make_face()
    revolve(axis=Axis((0, 0, 0), (0, 0, 1)), revolution_arc=40.728517997, mode=Mode.SUBTRACT)
    with BuildSketch(Plane(origin=(0, 0, 0), x_dir=(0.3479873047646927, 0.9374992457184191, 0), z_dir=(0.9374992457184191, -0.3479873047646927, 0))) as fillet10_piece_23_section:
        with BuildLine():
            CenterArc((80.5 - FILLET10_R, FILLET10_R), FILLET10_R, 270, 90)
            Line((80.5 - FILLET10_R, 0), (80.5, 0))
            Line((80.5, 0), (80.5, FILLET10_R))
        make_face()
    fillet10_piece_23 = revolve(axis=Axis((0, 0, 0), (0, 0, 1)), revolution_arc=46.06707315, mode=Mode.PRIVATE)
    fillet10_piece_23 = split(fillet10_piece_23, bisect_by=Plane(origin=(-33.27339912, 72.555794184, 0.682281157), z_dir=(-0.9089762569707115, -0.41684789103882386, 0)), keep=Keep.TOP, mode=Mode.PRIVATE)
    add(fillet10_piece_23, mode=Mode.SUBTRACT)
    with BuildSketch(Plane(origin=(0, 0, 0), x_dir=(0.9010582131201076, -0.43369816297604785, 0), z_dir=(-0.43369816297604785, -0.9010582131201076, 0))) as fillet10_piece_24_section:
        with BuildLine():
            CenterArc((80.5 - FILLET10_R, FILLET10_R), FILLET10_R, 270, 90)
            Line((80.5 - FILLET10_R, 0), (80.5, 0))
            Line((80.5, 0), (80.5, FILLET10_R))
        make_face()
    fillet10_piece_24 = revolve(axis=Axis((0, 0, 0), (0, 0, 1)), revolution_arc=25.70248486, mode=Mode.PRIVATE)
    fillet10_piece_24 = split(fillet10_piece_24, bisect_by=Plane(origin=(72.555796773, -33.273400307, 0.682281157), z_dir=(-0.4168478910388259, -0.9089762569707107, 0)), keep=Keep.TOP, mode=Mode.PRIVATE)
    add(fillet10_piece_24, mode=Mode.SUBTRACT)
    with BuildSketch(Plane(origin=(0, 0, 0), x_dir=(0.9374992457184188, -0.3479873047646939, 0), z_dir=(-0.3479873047646939, -0.9374992457184188, 0))) as fillet10_piece_25:
        with BuildLine():
            CenterArc((80.5 - FILLET10_R, FILLET10_R), FILLET10_R, 270, 90)
            Line((80.5 - FILLET10_R, 0), (80.5, 0))
            Line((80.5, 0), (80.5, FILLET10_R))
        make_face()
    revolve(axis=Axis((0, 0, 0), (0, 0, 1)), revolution_arc=20.364258998, mode=Mode.SUBTRACT)

    # Sketch11 → Cut-Extrude3 (cut, two sides: drawn at the far end of the back side and taken through both)
    with BuildSketch(Plane(origin=(0, 0, 0), x_dir=(-1, 0, 0), z_dir=(0, 0, -1)).offset(-CUT_EXTRUDE3_DEPTH_BACK)):
        Polygon((0, 0), (45.922011884, 110.865543901), (156.787555785, 64.943532018), (64.943532018, -156.787555785), (-45.922011884, -110.865543901), align=None)
    extrude(amount=CUT_EXTRUDE3_DEPTH + CUT_EXTRUDE3_DEPTH_BACK, mode=Mode.SUBTRACT)


solid = part.part
